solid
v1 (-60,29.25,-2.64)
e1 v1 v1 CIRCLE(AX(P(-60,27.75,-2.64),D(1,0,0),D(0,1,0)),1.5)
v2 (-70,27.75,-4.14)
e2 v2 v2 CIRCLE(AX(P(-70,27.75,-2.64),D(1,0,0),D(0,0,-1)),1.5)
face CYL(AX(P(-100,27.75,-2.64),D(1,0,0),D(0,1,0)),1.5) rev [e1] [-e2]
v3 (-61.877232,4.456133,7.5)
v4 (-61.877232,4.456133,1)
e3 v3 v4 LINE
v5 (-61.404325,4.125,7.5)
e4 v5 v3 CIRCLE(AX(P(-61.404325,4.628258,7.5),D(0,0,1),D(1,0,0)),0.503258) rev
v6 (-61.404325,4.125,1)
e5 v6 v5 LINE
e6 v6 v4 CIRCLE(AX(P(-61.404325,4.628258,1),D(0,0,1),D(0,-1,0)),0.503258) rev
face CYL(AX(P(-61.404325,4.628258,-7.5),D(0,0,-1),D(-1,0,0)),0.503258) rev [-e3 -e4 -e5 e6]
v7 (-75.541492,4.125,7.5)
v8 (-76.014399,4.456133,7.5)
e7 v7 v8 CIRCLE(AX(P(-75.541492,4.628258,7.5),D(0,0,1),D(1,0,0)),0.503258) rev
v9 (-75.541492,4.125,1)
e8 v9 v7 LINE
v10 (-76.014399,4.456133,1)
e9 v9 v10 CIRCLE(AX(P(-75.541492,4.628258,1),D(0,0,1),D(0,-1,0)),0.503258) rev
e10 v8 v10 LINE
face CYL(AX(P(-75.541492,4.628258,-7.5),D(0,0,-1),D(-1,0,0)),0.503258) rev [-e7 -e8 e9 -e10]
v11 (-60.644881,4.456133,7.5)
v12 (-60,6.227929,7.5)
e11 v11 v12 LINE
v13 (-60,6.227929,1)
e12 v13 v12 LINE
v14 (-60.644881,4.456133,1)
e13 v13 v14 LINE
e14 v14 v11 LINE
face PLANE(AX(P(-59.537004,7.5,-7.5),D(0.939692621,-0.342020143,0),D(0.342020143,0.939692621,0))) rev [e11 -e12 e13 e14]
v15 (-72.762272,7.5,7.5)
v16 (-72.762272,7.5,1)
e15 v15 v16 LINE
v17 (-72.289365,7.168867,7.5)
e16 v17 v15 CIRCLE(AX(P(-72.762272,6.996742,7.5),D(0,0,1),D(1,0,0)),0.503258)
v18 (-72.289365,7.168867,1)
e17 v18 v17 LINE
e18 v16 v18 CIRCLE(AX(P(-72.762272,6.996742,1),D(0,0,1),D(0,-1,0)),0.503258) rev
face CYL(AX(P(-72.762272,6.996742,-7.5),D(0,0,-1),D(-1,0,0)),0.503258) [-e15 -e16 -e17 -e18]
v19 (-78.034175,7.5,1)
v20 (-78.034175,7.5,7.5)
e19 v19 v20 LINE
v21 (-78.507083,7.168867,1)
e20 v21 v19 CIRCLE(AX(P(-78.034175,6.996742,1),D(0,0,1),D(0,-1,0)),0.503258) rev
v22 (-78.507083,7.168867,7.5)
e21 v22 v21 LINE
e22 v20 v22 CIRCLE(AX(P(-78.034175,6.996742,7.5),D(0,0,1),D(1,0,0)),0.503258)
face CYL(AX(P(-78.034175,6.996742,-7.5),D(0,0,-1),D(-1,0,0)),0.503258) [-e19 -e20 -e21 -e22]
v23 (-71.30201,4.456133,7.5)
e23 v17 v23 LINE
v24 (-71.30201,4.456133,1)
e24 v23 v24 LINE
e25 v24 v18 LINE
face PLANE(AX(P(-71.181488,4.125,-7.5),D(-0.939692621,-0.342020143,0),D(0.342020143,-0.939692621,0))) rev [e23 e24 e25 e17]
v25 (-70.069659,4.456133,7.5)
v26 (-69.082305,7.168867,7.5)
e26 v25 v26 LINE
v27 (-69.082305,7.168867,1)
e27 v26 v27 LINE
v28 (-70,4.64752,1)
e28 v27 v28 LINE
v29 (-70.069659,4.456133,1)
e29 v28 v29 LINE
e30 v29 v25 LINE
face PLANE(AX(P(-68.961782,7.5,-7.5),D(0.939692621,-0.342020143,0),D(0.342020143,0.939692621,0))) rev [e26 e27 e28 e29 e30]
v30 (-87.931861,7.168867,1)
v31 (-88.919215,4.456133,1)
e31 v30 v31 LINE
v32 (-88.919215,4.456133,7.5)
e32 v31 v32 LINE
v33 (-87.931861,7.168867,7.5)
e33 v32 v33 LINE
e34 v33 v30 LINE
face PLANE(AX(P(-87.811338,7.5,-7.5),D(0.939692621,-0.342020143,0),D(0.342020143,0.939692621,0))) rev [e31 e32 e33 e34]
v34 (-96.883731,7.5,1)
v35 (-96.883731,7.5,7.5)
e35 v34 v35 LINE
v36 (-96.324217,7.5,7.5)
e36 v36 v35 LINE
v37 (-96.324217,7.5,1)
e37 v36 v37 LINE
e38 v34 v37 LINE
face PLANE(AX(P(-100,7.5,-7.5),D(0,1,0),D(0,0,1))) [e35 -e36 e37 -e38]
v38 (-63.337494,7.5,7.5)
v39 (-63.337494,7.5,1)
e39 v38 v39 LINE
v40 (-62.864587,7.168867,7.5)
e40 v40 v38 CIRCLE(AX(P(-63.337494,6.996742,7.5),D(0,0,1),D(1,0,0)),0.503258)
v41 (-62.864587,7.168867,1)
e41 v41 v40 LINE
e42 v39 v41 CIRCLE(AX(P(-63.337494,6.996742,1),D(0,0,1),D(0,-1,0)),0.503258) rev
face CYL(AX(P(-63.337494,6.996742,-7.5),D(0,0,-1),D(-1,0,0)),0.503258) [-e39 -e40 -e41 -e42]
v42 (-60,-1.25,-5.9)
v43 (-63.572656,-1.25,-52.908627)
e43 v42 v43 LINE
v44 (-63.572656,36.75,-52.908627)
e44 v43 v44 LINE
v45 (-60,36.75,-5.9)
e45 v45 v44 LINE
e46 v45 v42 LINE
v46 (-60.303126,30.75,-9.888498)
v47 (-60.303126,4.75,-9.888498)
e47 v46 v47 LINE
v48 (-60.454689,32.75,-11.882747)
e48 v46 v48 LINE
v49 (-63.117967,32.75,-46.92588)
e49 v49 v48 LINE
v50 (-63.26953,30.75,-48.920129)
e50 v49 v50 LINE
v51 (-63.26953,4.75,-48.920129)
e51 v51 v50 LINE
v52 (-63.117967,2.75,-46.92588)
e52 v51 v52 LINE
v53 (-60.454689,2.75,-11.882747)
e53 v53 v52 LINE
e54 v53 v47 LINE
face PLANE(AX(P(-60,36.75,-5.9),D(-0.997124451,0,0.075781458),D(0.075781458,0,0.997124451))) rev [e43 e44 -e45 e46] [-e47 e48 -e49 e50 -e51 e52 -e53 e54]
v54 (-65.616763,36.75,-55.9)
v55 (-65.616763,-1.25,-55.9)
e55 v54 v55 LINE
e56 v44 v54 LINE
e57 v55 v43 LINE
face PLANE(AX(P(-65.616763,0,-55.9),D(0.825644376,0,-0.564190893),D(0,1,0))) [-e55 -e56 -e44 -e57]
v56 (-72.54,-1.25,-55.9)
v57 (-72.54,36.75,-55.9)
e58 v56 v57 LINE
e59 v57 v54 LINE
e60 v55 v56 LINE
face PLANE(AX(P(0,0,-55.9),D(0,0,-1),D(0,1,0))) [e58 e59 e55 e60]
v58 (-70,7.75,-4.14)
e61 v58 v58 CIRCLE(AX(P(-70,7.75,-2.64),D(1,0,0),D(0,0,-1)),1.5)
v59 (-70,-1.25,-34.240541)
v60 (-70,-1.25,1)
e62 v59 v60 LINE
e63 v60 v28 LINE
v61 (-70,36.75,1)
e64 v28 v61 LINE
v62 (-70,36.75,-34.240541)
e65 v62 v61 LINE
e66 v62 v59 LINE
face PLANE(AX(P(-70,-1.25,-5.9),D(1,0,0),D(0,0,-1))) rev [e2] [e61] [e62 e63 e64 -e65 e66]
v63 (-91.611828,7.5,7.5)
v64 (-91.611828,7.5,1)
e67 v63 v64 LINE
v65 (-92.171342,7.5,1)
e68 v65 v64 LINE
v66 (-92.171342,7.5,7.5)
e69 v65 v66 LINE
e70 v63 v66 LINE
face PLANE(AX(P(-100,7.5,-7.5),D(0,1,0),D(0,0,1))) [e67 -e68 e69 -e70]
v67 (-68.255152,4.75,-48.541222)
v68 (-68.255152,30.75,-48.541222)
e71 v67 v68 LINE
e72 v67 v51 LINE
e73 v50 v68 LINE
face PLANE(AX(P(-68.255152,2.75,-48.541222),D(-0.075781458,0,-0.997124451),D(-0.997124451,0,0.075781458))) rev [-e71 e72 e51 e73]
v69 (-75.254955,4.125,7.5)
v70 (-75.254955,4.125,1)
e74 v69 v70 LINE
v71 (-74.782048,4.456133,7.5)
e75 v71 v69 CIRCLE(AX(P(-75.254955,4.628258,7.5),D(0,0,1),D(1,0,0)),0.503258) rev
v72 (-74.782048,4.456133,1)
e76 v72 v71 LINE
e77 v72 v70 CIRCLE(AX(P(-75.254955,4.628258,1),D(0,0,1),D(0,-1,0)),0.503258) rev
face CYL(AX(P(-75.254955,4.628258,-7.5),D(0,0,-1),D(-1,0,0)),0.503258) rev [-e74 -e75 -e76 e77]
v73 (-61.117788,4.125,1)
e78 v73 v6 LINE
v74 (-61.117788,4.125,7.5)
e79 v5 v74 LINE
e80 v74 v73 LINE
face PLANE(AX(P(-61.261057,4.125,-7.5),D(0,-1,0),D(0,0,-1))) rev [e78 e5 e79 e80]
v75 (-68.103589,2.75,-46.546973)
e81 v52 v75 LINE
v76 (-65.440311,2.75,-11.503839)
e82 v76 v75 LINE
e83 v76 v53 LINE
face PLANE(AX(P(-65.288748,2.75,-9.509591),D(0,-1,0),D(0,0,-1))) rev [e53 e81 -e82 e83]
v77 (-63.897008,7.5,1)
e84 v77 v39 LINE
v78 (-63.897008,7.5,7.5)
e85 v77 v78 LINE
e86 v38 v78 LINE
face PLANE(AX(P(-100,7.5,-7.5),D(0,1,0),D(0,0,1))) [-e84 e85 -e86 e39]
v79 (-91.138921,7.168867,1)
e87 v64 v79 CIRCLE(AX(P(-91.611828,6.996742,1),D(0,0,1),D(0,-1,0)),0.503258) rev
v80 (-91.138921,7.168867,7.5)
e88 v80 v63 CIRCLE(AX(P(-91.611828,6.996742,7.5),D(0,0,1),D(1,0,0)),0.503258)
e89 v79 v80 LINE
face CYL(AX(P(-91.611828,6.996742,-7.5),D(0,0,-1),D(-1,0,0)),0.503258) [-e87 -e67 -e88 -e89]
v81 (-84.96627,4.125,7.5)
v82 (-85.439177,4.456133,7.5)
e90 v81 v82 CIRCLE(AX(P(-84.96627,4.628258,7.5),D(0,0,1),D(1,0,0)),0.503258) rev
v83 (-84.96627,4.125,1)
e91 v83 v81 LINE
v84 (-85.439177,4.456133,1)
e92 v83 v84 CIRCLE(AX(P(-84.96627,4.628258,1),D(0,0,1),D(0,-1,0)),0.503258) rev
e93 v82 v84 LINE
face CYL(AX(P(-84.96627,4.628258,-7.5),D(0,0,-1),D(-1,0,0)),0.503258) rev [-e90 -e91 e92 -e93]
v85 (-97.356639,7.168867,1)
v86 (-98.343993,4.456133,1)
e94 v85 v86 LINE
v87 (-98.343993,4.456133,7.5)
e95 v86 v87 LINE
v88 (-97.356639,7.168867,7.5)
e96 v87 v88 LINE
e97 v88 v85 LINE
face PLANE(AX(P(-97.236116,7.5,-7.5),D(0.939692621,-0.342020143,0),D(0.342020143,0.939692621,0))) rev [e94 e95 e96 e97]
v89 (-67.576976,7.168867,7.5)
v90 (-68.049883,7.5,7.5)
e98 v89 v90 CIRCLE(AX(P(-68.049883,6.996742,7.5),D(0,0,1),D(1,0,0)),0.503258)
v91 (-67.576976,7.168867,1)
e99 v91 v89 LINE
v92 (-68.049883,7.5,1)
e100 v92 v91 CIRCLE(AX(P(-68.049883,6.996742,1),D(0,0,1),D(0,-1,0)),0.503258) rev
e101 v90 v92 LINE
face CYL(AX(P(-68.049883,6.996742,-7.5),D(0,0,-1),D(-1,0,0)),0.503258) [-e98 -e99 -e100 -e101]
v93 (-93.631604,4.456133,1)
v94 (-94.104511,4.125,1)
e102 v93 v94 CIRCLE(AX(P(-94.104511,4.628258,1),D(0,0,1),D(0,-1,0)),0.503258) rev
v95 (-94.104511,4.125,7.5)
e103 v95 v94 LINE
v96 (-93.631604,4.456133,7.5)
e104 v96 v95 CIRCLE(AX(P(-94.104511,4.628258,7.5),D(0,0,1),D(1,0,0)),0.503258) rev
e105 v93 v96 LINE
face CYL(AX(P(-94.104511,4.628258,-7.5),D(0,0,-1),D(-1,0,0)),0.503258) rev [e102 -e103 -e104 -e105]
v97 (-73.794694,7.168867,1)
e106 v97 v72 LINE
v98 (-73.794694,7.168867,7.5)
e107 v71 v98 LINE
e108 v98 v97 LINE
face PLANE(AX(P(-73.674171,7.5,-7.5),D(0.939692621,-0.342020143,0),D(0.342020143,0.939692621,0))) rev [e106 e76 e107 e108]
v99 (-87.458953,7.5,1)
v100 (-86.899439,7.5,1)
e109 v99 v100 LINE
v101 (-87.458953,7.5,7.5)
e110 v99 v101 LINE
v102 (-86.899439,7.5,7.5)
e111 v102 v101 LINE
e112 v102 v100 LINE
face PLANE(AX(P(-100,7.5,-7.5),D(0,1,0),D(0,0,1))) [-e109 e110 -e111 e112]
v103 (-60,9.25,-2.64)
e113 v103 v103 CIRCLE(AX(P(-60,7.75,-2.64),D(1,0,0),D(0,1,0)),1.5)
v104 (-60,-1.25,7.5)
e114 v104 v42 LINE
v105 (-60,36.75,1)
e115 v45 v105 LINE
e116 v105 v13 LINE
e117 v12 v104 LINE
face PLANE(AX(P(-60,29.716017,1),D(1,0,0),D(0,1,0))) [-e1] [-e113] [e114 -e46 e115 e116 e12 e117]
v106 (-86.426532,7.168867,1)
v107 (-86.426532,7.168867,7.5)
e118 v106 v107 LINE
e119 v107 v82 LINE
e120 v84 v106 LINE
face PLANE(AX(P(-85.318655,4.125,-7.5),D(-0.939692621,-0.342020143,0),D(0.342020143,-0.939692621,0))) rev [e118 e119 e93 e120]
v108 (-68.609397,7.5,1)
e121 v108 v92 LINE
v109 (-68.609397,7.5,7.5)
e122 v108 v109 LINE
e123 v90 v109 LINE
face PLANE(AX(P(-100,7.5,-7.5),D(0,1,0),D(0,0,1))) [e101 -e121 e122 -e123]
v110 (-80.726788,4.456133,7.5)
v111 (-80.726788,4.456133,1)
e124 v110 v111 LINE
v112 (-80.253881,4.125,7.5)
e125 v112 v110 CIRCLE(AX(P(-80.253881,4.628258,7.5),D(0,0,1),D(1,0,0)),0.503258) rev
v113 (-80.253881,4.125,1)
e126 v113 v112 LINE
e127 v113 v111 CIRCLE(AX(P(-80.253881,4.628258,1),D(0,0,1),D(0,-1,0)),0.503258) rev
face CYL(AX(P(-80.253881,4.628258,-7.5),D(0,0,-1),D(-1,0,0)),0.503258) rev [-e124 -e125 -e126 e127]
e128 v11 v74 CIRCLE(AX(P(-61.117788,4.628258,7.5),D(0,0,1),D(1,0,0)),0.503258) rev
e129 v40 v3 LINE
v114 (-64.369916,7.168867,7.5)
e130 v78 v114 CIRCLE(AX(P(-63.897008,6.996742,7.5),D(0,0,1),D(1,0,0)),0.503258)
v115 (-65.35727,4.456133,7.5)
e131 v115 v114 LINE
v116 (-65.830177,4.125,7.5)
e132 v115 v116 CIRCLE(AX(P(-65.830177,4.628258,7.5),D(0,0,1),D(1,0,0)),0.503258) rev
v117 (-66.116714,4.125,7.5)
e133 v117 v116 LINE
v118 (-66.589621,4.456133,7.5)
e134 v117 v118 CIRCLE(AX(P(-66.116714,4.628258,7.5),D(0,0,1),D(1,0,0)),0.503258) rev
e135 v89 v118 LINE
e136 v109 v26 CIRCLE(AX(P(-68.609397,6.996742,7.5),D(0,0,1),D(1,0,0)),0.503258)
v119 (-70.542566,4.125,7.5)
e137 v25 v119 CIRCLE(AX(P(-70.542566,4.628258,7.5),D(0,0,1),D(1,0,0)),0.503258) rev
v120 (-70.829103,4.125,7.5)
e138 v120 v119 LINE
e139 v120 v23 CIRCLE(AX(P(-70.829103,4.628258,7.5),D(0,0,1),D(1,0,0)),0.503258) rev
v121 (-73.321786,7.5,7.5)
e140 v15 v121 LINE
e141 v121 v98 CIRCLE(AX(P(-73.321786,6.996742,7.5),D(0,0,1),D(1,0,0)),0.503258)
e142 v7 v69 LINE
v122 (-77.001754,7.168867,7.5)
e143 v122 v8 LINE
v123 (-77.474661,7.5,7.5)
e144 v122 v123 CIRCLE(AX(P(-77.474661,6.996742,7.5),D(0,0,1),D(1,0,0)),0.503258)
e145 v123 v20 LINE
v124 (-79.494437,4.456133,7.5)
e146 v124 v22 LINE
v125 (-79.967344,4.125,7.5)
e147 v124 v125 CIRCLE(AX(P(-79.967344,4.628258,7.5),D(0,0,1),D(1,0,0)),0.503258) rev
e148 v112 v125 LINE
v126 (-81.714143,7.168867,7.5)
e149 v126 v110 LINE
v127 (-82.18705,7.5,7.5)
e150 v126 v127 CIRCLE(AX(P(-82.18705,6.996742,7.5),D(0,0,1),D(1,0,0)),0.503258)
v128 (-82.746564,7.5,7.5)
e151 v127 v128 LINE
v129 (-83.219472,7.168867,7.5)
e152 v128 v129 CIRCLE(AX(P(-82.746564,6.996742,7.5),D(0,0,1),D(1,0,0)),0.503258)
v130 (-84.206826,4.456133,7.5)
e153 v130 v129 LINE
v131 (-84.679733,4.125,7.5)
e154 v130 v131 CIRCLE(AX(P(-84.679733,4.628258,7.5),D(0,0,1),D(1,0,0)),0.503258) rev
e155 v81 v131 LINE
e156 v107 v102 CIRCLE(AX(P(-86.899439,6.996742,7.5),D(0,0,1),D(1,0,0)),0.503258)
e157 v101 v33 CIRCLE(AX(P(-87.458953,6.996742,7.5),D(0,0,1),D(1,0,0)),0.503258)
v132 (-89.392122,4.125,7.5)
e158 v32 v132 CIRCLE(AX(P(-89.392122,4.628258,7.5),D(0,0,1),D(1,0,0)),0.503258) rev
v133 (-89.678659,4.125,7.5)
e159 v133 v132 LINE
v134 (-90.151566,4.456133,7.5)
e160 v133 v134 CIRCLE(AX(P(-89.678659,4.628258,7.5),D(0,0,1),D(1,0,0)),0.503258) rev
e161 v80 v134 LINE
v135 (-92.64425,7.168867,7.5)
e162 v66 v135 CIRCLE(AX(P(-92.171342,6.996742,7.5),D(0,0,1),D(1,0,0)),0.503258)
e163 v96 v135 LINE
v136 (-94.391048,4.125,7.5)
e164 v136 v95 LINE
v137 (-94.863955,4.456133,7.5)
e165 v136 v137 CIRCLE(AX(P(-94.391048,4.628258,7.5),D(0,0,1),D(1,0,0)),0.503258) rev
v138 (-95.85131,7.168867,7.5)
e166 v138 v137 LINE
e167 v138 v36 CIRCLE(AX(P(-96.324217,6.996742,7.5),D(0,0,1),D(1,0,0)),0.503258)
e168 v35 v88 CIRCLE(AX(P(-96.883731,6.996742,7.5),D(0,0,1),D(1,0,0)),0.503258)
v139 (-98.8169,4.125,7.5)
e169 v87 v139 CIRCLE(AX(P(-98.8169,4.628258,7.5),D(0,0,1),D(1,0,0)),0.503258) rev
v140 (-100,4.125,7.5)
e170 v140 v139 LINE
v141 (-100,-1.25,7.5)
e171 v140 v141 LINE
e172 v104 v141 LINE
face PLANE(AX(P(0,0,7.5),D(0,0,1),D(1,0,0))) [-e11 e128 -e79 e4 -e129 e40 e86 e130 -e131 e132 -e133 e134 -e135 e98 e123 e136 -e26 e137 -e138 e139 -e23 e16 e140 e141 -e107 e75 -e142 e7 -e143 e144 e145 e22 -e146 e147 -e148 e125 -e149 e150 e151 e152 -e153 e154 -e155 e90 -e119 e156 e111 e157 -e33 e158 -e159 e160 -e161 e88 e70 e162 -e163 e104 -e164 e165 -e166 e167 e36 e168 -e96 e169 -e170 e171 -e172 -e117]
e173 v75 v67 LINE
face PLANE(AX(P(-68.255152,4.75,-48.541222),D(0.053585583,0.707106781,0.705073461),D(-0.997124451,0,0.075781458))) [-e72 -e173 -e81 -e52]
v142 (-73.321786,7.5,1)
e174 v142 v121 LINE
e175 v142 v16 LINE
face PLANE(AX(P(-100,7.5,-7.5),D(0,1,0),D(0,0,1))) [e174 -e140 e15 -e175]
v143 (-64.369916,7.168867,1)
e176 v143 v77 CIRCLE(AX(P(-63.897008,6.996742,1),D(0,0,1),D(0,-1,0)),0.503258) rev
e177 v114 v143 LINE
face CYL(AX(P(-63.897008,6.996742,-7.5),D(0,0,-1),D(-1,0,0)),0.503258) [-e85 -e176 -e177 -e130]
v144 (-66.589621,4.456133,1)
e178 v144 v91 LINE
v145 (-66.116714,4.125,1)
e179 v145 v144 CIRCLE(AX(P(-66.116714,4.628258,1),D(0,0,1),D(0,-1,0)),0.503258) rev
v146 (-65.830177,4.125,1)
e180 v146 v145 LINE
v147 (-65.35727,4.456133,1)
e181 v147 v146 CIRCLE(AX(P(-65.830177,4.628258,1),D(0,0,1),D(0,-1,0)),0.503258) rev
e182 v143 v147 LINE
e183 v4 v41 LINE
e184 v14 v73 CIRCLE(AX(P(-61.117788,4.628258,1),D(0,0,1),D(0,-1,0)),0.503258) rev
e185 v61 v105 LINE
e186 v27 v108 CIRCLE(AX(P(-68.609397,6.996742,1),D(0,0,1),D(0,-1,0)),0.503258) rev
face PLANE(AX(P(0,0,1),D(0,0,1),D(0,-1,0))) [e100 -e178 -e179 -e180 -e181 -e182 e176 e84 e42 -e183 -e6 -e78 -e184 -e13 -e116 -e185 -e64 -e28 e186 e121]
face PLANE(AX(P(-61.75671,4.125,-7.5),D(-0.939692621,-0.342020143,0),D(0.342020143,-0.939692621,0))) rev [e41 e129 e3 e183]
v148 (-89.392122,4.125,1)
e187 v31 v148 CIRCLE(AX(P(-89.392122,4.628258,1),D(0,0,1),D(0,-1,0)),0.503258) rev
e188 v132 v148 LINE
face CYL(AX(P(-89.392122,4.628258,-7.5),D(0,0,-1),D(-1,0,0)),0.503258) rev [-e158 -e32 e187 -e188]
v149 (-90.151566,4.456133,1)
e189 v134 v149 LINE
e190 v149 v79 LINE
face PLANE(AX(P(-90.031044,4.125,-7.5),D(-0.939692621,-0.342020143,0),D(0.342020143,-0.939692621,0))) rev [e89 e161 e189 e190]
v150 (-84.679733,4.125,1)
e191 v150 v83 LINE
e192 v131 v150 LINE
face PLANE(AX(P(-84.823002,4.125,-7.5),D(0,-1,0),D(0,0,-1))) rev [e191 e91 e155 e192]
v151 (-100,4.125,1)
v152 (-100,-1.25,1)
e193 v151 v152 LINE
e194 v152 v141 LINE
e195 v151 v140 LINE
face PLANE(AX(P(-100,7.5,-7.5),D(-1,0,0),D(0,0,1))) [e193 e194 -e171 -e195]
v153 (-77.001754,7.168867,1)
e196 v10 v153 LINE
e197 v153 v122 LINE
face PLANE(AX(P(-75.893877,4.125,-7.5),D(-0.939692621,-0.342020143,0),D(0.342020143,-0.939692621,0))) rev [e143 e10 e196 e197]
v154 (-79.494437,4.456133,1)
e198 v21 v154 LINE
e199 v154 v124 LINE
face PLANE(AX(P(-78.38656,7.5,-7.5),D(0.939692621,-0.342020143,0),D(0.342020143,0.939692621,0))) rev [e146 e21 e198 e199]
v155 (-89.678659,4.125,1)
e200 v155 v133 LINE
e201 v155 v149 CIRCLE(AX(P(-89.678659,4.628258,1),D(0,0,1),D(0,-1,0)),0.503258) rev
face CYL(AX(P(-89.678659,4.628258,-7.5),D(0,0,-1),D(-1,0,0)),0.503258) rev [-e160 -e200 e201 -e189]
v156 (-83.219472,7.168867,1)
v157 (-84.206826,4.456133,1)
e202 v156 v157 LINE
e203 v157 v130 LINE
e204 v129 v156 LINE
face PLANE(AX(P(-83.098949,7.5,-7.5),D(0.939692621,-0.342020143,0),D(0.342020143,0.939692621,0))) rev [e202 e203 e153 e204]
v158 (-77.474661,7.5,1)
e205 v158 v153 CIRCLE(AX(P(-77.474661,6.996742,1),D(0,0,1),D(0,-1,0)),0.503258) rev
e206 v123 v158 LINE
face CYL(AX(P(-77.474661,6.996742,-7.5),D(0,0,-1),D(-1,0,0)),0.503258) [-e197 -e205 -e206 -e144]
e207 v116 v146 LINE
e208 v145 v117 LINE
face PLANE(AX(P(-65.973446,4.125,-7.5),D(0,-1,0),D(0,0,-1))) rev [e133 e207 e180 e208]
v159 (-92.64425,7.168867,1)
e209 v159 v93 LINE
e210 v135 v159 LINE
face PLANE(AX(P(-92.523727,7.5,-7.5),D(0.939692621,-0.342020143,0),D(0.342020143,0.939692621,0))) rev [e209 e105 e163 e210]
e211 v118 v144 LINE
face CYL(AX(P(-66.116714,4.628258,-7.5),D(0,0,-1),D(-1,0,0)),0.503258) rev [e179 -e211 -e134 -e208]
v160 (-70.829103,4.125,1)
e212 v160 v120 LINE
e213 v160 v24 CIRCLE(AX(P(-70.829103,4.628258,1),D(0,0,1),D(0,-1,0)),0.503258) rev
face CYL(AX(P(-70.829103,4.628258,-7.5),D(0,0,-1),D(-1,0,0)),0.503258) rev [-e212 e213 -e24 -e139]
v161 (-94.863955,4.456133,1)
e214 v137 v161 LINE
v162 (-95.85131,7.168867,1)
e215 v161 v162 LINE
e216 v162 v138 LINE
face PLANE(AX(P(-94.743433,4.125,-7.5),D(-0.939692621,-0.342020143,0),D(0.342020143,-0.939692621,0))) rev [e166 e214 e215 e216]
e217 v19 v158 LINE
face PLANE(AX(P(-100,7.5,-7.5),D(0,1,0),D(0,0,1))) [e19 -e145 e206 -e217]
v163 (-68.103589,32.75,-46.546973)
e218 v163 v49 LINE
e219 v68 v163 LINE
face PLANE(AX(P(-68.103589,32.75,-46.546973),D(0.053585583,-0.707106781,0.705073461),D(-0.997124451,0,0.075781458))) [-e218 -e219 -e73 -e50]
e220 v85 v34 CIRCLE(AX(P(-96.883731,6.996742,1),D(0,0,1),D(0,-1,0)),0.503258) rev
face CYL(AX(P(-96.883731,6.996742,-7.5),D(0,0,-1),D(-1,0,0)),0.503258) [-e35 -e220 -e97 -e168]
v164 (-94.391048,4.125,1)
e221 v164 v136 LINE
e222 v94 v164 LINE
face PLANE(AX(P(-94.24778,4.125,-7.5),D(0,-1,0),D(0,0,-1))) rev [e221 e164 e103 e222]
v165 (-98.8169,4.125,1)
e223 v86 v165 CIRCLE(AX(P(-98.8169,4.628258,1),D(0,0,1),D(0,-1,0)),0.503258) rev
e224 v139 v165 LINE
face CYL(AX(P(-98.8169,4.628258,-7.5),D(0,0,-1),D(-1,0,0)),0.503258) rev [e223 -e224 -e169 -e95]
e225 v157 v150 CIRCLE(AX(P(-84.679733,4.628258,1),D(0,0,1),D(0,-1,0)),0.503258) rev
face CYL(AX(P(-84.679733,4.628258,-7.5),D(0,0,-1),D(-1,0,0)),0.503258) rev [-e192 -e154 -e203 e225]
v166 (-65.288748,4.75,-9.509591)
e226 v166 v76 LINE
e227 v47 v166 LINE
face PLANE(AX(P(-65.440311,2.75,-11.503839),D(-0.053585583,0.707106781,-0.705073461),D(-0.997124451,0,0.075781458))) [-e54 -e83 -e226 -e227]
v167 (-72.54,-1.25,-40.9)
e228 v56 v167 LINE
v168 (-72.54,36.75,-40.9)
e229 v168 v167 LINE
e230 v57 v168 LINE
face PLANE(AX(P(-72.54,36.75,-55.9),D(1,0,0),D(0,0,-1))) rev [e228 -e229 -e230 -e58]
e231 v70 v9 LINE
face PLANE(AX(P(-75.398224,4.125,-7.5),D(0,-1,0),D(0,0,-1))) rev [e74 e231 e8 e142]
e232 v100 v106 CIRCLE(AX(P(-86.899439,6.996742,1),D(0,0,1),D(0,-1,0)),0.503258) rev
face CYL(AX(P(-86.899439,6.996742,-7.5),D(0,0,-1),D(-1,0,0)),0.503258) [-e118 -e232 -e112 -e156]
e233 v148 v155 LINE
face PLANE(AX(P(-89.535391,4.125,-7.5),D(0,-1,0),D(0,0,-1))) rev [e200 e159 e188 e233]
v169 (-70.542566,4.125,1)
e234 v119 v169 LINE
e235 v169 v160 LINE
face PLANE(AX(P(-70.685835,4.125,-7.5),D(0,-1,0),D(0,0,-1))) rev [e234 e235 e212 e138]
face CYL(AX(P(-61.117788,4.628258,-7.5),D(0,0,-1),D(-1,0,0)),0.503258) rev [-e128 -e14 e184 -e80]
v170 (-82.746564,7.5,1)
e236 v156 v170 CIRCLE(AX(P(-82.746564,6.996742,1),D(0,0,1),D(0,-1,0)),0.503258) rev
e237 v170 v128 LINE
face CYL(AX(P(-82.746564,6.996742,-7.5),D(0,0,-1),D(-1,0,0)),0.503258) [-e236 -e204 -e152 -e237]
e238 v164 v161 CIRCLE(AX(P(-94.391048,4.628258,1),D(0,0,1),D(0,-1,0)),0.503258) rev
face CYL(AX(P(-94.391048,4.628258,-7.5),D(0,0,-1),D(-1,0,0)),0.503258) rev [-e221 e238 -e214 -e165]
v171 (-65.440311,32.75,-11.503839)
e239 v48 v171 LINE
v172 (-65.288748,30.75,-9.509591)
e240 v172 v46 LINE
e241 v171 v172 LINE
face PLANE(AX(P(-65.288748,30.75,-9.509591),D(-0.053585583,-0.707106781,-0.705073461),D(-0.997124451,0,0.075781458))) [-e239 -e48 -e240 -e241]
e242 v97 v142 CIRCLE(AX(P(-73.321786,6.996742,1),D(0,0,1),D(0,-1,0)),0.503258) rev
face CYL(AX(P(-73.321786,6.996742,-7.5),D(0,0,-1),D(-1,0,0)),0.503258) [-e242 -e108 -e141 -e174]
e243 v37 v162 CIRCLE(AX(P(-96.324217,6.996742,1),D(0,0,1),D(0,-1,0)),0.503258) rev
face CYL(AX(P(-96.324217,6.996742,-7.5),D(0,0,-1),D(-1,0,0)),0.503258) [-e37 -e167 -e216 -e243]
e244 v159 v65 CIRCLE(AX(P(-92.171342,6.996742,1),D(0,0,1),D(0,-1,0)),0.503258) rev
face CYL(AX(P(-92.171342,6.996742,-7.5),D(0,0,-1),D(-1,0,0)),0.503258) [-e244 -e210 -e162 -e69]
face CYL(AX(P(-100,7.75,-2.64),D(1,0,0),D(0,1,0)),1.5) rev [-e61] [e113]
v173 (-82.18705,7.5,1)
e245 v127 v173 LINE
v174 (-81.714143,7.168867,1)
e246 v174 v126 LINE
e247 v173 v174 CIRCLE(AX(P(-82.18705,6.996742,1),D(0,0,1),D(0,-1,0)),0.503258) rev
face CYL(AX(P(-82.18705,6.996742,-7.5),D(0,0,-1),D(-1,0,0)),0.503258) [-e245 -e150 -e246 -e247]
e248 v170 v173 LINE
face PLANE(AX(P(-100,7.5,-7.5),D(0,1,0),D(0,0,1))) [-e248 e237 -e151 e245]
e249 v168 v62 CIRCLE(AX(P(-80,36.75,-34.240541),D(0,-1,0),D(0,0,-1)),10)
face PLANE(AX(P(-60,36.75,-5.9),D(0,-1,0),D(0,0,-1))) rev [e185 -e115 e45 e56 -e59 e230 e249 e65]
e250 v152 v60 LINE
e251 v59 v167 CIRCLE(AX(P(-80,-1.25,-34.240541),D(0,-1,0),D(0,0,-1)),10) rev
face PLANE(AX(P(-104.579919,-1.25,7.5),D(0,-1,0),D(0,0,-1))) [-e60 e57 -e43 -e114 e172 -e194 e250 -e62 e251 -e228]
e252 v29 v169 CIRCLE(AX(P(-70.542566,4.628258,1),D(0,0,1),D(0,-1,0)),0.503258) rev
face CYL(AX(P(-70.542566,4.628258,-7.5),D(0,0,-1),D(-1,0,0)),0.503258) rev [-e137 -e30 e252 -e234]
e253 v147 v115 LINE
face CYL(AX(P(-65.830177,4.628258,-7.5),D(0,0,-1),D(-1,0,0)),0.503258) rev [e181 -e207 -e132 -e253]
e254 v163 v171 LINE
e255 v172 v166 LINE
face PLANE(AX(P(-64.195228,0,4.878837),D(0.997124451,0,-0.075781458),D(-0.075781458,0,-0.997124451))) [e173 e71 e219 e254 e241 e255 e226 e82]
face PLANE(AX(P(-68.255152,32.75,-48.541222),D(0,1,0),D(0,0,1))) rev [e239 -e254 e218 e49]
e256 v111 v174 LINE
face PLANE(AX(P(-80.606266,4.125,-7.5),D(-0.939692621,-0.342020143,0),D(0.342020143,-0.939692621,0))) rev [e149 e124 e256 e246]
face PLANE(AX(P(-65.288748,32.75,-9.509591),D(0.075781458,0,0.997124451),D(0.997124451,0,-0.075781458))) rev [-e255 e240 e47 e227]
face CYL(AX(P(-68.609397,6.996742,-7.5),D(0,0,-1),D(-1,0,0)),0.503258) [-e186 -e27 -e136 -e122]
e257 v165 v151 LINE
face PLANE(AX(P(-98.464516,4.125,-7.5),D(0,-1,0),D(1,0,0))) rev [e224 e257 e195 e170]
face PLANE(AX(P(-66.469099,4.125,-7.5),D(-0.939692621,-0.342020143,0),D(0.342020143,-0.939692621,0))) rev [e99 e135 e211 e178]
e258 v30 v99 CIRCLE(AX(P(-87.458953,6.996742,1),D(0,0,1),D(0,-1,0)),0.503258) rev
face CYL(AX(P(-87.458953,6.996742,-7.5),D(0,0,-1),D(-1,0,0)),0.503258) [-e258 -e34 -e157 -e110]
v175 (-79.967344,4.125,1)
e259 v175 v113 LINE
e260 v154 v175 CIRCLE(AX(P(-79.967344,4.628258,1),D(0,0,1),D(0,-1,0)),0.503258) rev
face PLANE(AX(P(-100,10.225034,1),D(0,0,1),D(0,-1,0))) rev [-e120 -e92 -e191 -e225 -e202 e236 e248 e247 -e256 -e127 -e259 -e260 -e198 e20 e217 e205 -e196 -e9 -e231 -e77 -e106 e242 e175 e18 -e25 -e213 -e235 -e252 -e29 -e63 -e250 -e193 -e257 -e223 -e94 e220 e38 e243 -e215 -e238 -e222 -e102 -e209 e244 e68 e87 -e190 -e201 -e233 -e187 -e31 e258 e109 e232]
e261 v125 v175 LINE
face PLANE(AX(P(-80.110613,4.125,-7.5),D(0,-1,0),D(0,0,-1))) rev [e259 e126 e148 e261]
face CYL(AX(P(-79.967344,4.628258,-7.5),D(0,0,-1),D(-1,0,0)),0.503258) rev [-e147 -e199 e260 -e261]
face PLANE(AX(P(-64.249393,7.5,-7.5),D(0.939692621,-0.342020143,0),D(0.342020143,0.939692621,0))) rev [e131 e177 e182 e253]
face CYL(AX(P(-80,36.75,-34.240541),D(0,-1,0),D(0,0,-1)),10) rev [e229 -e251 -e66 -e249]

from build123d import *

# Parameters (mm, degrees)
BOSS_EXTRUDE1_DEPTH      = 7.5
BOSS_EXTRUDE1_DEPTH_BACK = 7.5
SKETCH3_W                = 200
SKETCH3_H                = 15
CUT_EXTRUDE1_DEPTH       = 101.560926806
FILLET1_R                = 0.503257554
LPATTERN1_COUNT          = 42
LPATTERN1_PITCH          = 4.71238898
FILLET1_OF_LPATTERN1_R   = 0.503257554
CUT_EXTRUDE2_DEPTH       = 101.560926806
CUT_EXTRUDE2_DEPTH_BACK  = 101.560926806
SKETCH5_W                = 4.71238898
SKETCH5_H                = 3.375
CUT_EXTRUDE3_DEPTH       = 101.560926806
CUT_EXTRUDE3_DEPTH_BACK  = 101.560926806
SKETCH6_W                = 13.890612777
SKETCH6_H                = 21.950597968
CUT_EXTRUDE6_DEPTH       = 101.560926806
CUT_EXTRUDE6_DEPTH_BACK  = 101.560926806
SKETCH8_W                = 175.100830171
SKETCH8_H                = 44.946806771
SKETCH9_W                = 55.501850732
SKETCH9_H                = 10.784038355
CUT_EXTRUDE7_DEPTH       = 101.560926806
SKETCH10_W               = 10
SKETCH10_H               = 38
BOSS_EXTRUDE2_DEPTH      = 6.9
SKETCH11_W               = 12.54
SKETCH11_H               = 38
BOSS_EXTRUDE3_DEPTH      = 50
SKETCH12_W               = 2.54
SKETCH12_H               = 35
CUT_EXTRUDE8_DEPTH       = 121.701325593
CHAMFER1_SIZE            = 3
CHAMFER1_SIZE2           = 1.816762814
FILLET2_R                = 10
SKETCH13_W               = 39.144192087
SKETCH13_H               = 30
CUT_EXTRUDE9_DEPTH       = 5
CHAMFER2_SIZE            = 2
SKETCH14_R               = 1.5
CUT_EXTRUDE10_DEPTH      = 78.944675893


with BuildPart() as part:
    # Sketch3 → Boss-Extrude1 (new, two sides: drawn at the far end of the back side and taken through both)
    with BuildSketch(Plane.XY.offset(-BOSS_EXTRUDE1_DEPTH_BACK)):
        Rectangle(SKETCH3_W, SKETCH3_H)
    extrude(amount=BOSS_EXTRUDE1_DEPTH + BOSS_EXTRUDE1_DEPTH_BACK)

    # Sketch4 → Cut-Extrude1 (cut, symmetric)
    with BuildSketch(Plane.XY):
        Polygon((-94.247779608, 7.5), (-94.247779608, 4.125), (-94.743432664, 4.125), (-95.971832204, 7.5), align=None)
        Polygon((-97.236115992, 7.5), (-98.464515532, 4.125), (-98.960168588, 4.125), (-98.960168588, 7.5), align=None)
    cut_extrude1 = extrude(amount=CUT_EXTRUDE1_DEPTH, both=True, mode=Mode.SUBTRACT)

    # Fillet1
    fillet1_edges = [part.edges().sort_by_distance(p)[0] for p in [
        (-95.971832204, 7.5, 0),
        (-94.743432664, 4.125, 0),
        (-97.236115992, 7.5, 0),
        (-98.464515532, 4.125, 0),
    ]]
    fillet(fillet1_edges, radius=FILLET1_R)

    # LPattern1: Cut-Extrude1 ×42
    with Locations(*[(i * LPATTERN1_PITCH, 0, 0) for i in range(1, LPATTERN1_COUNT)]):
        add(cut_extrude1, mode=Mode.SUBTRACT)

    # Fillet1 of LPattern1
    fillet1_of_lpattern1_edges = [part.edges().sort_by_distance(p)[0] for p in [
        (-91.259443224, 7.5, 0),
        (-90.031043683, 4.125, 0),
        (-92.523727011, 7.5, 0),
        (-93.752126552, 4.125, 0),
        (-86.547054243, 7.5, 0),
        (-85.318654703, 4.125, 0),
        (-87.811338031, 7.5, 0),
        (-89.039737571, 4.125, 0),
        (-81.834665263, 7.5, 0),
        (-80.606265722, 4.125, 0),
        (-83.09894905, 7.5, 0),
        (-84.327348591, 4.125, 0),
        (-77.122276283, 7.5, 0),
        (-75.893876742, 4.125, 0),
        (-78.38656007, 7.5, 0),
        (-79.614959611, 4.125, 0),
        (-72.409887302, 7.5, 0),
        (-71.181487762, 4.125, 0),
        (-73.67417109, 7.5, 0),
        (-74.90257063, 4.125, 0),
        (-67.697498322, 7.5, 0),
        (-66.469098781, 4.125, 0),
        (-68.961782109, 7.5, 0),
        (-70.19018165, 4.125, 0),
        (-62.985109342, 7.5, 0),
        (-61.756709801, 4.125, 0),
        (-64.249393129, 7.5, 0),
        (-65.47779267, 4.125, 0),
        (-58.272720361, 7.5, 0),
        (-57.04432082, 4.125, 0),
        (-59.537004149, 7.5, 0),
        (-60.765403689, 4.125, 0),
        (-53.560331381, 7.5, 0),
        (-52.33193184, 4.125, 0),
        (-54.824615168, 7.5, 0),
        (-56.053014709, 4.125, 0),
        (-48.8479424, 7.5, 0),
        (-47.61954286, 4.125, 0),
        (-50.112226188, 7.5, 0),
        (-51.340625728, 4.125, 0),
        (-44.13555342, 7.5, 0),
        (-42.907153879, 4.125, 0),
        (-45.399837207, 7.5, 0),
        (-46.628236748, 4.125, 0),
        (-39.42316444, 7.5, 0),
        (-38.194764899, 4.125, 0),
        (-40.687448227, 7.5, 0),
        (-41.915847768, 4.125, 0),
        (-34.710775459, 7.5, 0),
        (-33.482375919, 4.125, 0),
        (-35.975059247, 7.5, 0),
        (-37.203458787, 4.125, 0),
        (-29.998386479, 7.5, 0),
        (-28.769986938, 4.125, 0),
        (-31.262670266, 7.5, 0),
        (-32.491069807, 4.125, 0),
        (-25.285997498, 7.5, 0),
        (-24.057597958, 4.125, 0),
        (-26.550281286, 7.5, 0),
        (-27.778680826, 4.125, 0),
        (-20.573608518, 7.5, 0),
        (-19.345208977, 4.125, 0),
        (-21.837892305, 7.5, 0),
        (-23.066291846, 4.125, 0),
        (-15.861219538, 7.5, 0),
        (-14.632819997, 4.125, 0),
        (-17.125503325, 7.5, 0),
        (-18.353902866, 4.125, 0),
        (-11.148830557, 7.5, 0),
        (-9.920431017, 4.125, 0),
        (-12.413114345, 7.5, 0),
        (-13.641513885, 4.125, 0),
        (-6.436441577, 7.5, 0),
        (-5.208042036, 4.125, 0),
        (-7.700725364, 7.5, 0),
        (-8.929124905, 4.125, 0),
        (-1.724052597, 7.5, 0),
        (-0.495653056, 4.125, 0),
        (-2.988336384, 7.5, 0),
        (-4.216735925, 4.125, 0),
        (2.988336384, 7.5, 0),
        (4.216735925, 4.125, 0),
        (1.724052596, 7.5, 0),
        (0.495653056, 4.125, 0),
        (7.700725364, 7.5, 0),
        (8.929124905, 4.125, 0),
        (6.436441577, 7.5, 0),
        (5.208042036, 4.125, 0),
        (12.413114345, 7.5, 0),
        (13.641513885, 4.125, 0),
        (11.148830557, 7.5, 0),
        (9.920431017, 4.125, 0),
        (17.125503325, 7.5, 0),
        (18.353902866, 4.125, 0),
        (15.861219538, 7.5, 0),
        (14.632819997, 4.125, 0),
        (21.837892305, 7.5, 0),
        (23.066291846, 4.125, 0),
        (20.573608518, 7.5, 0),
        (19.345208977, 4.125, 0),
        (26.550281286, 7.5, 0),
        (27.778680826, 4.125, 0),
        (25.285997498, 7.5, 0),
        (24.057597958, 4.125, 0),
        (31.262670266, 7.5, 0),
        (32.491069807, 4.125, 0),
        (29.998386479, 7.5, 0),
        (28.769986938, 4.125, 0),
        (35.975059247, 7.5, 0),
        (37.203458787, 4.125, 0),
        (34.710775459, 7.5, 0),
        (33.482375919, 4.125, 0),
        (40.687448227, 7.5, 0),
        (41.915847768, 4.125, 0),
        (39.42316444, 7.5, 0),
        (38.194764899, 4.125, 0),
        (45.399837207, 7.5, 0),
        (46.628236748, 4.125, 0),
        (44.13555342, 7.5, 0),
        (42.907153879, 4.125, 0),
        (50.112226188, 7.5, 0),
        (51.340625728, 4.125, 0),
        (48.8479424, 7.5, 0),
        (47.61954286, 4.125, 0),
        (54.824615168, 7.5, 0),
        (56.053014709, 4.125, 0),
        (53.560331381, 7.5, 0),
        (52.33193184, 4.125, 0),
        (59.537004148, 7.5, 0),
        (60.765403689, 4.125, 0),
        (58.272720361, 7.5, 0),
        (57.04432082, 4.125, 0),
        (64.249393129, 7.5, 0),
        (65.47779267, 4.125, 0),
        (62.985109341, 7.5, 0),
        (61.756709801, 4.125, 0),
        (68.961782109, 7.5, 0),
        (70.19018165, 4.125, 0),
        (67.697498322, 7.5, 0),
        (66.469098781, 4.125, 0),
        (73.67417109, 7.5, 0),
        (74.90257063, 4.125, 0),
        (72.409887302, 7.5, 0),
        (71.181487762, 4.125, 0),
        (78.38656007, 7.5, 0),
        (79.614959611, 4.125, 0),
        (77.122276283, 7.5, 0),
        (75.893876742, 4.125, 0),
        (83.09894905, 7.5, 0),
        (84.327348591, 4.125, 0),
        (81.834665263, 7.5, 0),
        (80.606265722, 4.125, 0),
        (87.811338031, 7.5, 0),
        (89.039737571, 4.125, 0),
        (86.547054243, 7.5, 0),
        (85.318654703, 4.125, 0),
        (92.523727011, 7.5, 0),
        (93.752126552, 4.125, 0),
        (91.259443224, 7.5, 0),
        (90.031043683, 4.125, 0),
        (97.236115992, 7.5, 0),
        (98.464515532, 4.125, 0),
        (95.971832204, 7.5, 0),
        (94.743432664, 4.125, 0),
    ]]
    fillet(fillet1_of_lpattern1_edges, radius=FILLET1_OF_LPATTERN1_R)

    # Sketch5 → Cut-Extrude2 (cut, two sides: drawn at the far end of the back side and taken through both)
    with BuildSketch(Plane.XY.offset(-CUT_EXTRUDE2_DEPTH_BACK)):
        with Locations((-101.316363078, 5.8125)):
            Rectangle(SKETCH5_W, SKETCH5_H)
        with Locations((101.316363078, 5.8125)):
            Rectangle(SKETCH5_W, SKETCH5_H)
    extrude(amount=CUT_EXTRUDE2_DEPTH + CUT_EXTRUDE2_DEPTH_BACK, mode=Mode.SUBTRACT)

    # Sketch6 → Cut-Extrude3 (cut, two sides: drawn at the far end of the back side and taken through both)
    with BuildSketch(Plane(origin=(0, 0, 0), x_dir=(0, 0, -1), z_dir=(1, 0, 0)).offset(-CUT_EXTRUDE3_DEPTH_BACK)):
        with Locations((5.945306389, -0.750264579)):
            Rectangle(SKETCH6_W, SKETCH6_H)
    extrude(amount=CUT_EXTRUDE3_DEPTH + CUT_EXTRUDE3_DEPTH_BACK, mode=Mode.SUBTRACT)

    # Sketch8 → Cut-Extrude6 (cut, two sides: drawn at the far end of the back side and taken through both)
    with BuildSketch(Plane.XY.offset(-CUT_EXTRUDE6_DEPTH_BACK)):
        with Locations((27.550415086, 7.242613414)):
            Rectangle(SKETCH8_W, SKETCH8_H)
    extrude(amount=CUT_EXTRUDE6_DEPTH + CUT_EXTRUDE6_DEPTH_BACK, mode=Mode.SUBTRACT)

    # Sketch9 → Cut-Extrude7 (cut, through all)
    with BuildSketch(Plane.XY):
        with Locations((-76.828993169, -6.642019178)):
            Rectangle(SKETCH9_W, SKETCH9_H)
    extrude(amount=CUT_EXTRUDE7_DEPTH, mode=Mode.SUBTRACT)

    # Sketch10 → Boss-Extrude2 (add)
    with BuildSketch(Plane(origin=(0, 0, 1), x_dir=(-1, 0, 0), z_dir=(0, 0, -1))):
        with Locations((65, 17.75)):
            Rectangle(SKETCH10_W, SKETCH10_H)
    extrude(amount=BOSS_EXTRUDE2_DEPTH)

    # Sketch11 → Boss-Extrude3 (add)
    with BuildSketch(Plane(origin=(0, 0, -5.9), x_dir=(-1, 0, 0), z_dir=(0, 0, -1))):
        with Locations((66.27, 17.75)):
            Rectangle(SKETCH11_W, SKETCH11_H)
    extrude(amount=BOSS_EXTRUDE3_DEPTH)

    # Sketch12 → Cut-Extrude8 (cut, through all)
    with BuildSketch(Plane.XZ.offset(1.25)):
        with Locations((-71.27, -23.4)):
            Rectangle(SKETCH12_W, SKETCH12_H)
        Polygon((-60, -5.9), (-63.8, -55.9), (-60, -55.9), align=None)
    extrude(amount=-CUT_EXTRUDE8_DEPTH, mode=Mode.SUBTRACT)

    # Chamfer1
    chamfer1_edges = [part.edges().sort_by_distance(p)[0] for p in [
        (-63.8, 17.75, -55.9),
    ]]
    chamfer1_side = [part.faces().sort_by_distance(p)[0] for p in [
        (-61.9, 17.75, -30.9),
    ]]
    chamfer(chamfer1_edges, length=CHAMFER1_SIZE, length2=CHAMFER1_SIZE2, reference=chamfer1_side[0])

    # Fillet2
    # the kernel refuses this fillet: 10 mm, written as the material it adds along each edge
    with BuildSketch(Plane(origin=(-70, -1.25, -40.9), x_dir=(-1, 0, 0), z_dir=(0, 1, 0))) as fillet2_piece_1:
        with BuildLine():
            CenterArc((10, 6.659459438), FILLET2_R, 180, 41.754936598)
            Line((0, 6.659459438), (-0.2, 6.659459438))
            Line((-0.2, 6.659459438), (-0.2, 0))
            Line((-0.2, 0), (0, -0.2))
            ThreePointArc((0, -0.2), (1.27, -0.2), (2.3908, -0.133189189))
            Line((2.3908, -0.133189189), (2.54, 0))
        make_face()
    extrude(amount=38)

    # Sketch13 → Cut-Extrude9 (cut)
    with BuildSketch(Plane(origin=(-59.20960532, 0, 4.499930004), x_dir=(-0.07578145826840343, 0, -0.997124450900044), z_dir=(0.997124450900044, 0, -0.07578145826840343))):
        with Locations((34.0020178, 17.75)):
            Rectangle(SKETCH13_W, SKETCH13_H)
    extrude(amount=-CUT_EXTRUDE9_DEPTH, mode=Mode.SUBTRACT)

    # Chamfer2
    chamfer2_edges = [part.edges().sort_by_distance(p)[0] for p in [
        (-62.79593696, 2.75, -9.699044158),
        (-62.79593696, 32.75, -9.699044158),
        (-65.762340919, 32.75, -48.730675198),
        (-65.762340919, 2.75, -48.730675198),
    ]]
    chamfer(chamfer2_edges, length=CHAMFER2_SIZE)

    # Sketch14 → Cut-Extrude10 (cut, through all)
    with BuildSketch(Plane(origin=(-60, 0, 0), x_dir=(0, 0, -1), z_dir=(1, 0, 0))):
        with Locations(Location((2.64, 27.75, 0), (0, 0, 90))):
            Circle(SKETCH14_R)
        with Locations(Location((2.64, 7.75, 0), (0, 0, 90))):
            Circle(SKETCH14_R)
    extrude(amount=-CUT_EXTRUDE10_DEPTH, mode=Mode.SUBTRACT)


solid = part.part
